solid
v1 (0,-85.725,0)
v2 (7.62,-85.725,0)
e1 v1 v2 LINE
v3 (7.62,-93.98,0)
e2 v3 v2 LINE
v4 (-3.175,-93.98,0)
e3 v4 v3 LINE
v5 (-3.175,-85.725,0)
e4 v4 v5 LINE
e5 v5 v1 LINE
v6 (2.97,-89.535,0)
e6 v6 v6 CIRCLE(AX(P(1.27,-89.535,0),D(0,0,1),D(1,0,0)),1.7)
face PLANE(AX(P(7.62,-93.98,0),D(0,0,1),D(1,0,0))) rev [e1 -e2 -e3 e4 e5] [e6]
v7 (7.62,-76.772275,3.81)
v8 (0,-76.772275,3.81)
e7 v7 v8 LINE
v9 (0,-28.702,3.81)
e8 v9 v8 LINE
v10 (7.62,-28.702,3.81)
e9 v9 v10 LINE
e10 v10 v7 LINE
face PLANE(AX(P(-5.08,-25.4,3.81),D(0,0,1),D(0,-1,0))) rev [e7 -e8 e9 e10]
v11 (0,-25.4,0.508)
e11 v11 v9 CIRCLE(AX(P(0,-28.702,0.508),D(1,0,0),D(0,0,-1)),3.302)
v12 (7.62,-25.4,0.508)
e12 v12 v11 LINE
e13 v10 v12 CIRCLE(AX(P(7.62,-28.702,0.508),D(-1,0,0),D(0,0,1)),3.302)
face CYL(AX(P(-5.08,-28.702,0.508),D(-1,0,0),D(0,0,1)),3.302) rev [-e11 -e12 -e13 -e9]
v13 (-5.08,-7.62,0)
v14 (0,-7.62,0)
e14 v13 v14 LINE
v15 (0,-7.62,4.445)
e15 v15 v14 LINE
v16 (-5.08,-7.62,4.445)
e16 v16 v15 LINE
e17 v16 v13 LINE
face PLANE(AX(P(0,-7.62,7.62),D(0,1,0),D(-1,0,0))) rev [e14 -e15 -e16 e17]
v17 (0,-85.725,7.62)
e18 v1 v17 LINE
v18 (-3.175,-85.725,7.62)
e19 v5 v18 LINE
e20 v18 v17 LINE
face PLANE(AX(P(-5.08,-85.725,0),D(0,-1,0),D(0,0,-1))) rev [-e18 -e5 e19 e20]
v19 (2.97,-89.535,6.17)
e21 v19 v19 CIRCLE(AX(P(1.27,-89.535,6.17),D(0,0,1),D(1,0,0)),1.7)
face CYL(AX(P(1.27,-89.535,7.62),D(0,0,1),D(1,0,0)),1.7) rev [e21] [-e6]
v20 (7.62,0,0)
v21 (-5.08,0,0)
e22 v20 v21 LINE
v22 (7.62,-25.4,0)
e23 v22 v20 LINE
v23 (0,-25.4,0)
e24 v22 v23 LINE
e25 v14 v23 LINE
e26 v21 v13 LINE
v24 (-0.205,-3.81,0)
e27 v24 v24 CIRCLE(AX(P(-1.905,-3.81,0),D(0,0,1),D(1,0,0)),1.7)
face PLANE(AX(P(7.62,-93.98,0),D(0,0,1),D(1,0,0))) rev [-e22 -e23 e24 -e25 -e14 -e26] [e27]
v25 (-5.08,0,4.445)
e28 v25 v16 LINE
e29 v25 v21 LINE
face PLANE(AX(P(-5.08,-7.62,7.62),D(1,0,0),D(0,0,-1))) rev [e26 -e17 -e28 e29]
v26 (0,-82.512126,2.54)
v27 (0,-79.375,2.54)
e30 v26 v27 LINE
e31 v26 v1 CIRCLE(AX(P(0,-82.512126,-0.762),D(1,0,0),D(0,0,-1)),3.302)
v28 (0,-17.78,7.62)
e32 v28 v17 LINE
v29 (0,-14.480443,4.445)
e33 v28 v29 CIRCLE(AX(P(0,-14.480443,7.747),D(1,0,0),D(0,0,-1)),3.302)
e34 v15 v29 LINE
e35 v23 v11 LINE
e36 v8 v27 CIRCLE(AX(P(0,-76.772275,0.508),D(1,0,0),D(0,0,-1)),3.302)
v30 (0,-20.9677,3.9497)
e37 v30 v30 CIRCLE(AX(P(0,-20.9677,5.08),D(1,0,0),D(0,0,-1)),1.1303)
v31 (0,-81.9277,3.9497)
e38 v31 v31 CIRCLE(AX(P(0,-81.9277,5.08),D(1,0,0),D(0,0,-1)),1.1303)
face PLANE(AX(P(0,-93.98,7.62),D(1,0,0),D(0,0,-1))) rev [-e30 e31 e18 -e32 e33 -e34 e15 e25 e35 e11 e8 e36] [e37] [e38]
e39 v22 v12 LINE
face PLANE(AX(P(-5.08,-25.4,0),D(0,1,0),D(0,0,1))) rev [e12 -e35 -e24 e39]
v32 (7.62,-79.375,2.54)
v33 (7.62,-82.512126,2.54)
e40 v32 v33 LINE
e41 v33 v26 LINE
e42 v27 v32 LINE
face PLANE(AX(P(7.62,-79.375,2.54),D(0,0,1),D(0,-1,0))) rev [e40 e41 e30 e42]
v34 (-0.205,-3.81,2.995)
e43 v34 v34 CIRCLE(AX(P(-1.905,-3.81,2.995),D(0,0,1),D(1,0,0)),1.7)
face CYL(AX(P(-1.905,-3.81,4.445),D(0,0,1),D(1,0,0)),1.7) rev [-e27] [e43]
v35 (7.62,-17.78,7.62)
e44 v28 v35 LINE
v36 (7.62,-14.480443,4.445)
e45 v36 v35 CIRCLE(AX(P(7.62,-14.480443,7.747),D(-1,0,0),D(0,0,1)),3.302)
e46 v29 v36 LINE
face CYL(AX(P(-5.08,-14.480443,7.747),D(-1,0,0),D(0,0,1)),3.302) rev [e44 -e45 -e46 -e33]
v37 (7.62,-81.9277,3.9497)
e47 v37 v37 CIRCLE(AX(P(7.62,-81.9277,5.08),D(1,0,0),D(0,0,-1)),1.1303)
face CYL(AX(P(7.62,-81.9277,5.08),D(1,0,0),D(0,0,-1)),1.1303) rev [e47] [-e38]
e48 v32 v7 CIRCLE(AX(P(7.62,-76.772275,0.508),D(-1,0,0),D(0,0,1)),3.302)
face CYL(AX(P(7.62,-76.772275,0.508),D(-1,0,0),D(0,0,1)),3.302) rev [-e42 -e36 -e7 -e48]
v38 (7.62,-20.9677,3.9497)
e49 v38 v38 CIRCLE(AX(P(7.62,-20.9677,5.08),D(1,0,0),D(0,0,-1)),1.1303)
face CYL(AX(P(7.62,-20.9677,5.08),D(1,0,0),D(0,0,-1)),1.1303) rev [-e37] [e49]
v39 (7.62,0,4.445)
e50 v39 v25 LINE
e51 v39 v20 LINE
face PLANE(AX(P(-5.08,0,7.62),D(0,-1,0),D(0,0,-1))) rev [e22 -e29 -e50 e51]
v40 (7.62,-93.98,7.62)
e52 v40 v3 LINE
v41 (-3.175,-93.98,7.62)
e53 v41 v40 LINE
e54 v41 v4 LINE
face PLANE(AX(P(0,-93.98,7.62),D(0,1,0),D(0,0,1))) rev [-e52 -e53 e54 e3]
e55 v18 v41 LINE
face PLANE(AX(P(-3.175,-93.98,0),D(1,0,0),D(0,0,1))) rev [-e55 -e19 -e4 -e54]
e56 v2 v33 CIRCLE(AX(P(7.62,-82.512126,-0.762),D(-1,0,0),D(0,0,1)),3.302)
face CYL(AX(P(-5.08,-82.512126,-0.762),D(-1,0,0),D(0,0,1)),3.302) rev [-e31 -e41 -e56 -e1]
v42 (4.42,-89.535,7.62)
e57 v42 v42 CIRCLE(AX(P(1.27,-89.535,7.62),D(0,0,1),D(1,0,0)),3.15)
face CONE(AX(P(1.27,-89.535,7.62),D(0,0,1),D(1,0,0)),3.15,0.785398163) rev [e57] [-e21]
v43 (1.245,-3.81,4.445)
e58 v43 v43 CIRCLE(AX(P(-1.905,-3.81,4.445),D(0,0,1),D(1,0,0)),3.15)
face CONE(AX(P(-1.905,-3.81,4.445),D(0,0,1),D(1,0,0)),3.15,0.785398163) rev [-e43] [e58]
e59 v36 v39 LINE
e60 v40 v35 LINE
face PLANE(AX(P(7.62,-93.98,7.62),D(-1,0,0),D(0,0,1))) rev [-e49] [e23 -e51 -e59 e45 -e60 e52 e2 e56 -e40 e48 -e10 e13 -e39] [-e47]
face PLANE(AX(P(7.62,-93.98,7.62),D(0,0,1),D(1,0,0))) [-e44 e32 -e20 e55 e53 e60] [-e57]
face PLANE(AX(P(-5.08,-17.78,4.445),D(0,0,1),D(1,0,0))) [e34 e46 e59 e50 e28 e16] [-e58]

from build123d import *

# Parameters (mm, degrees)
BOSS_EXTRUDE1_DEPTH                             = 7.62
SKETCH11_W                                      = 17.78
SKETCH11_H                                      = 17.78
CUT_EXTRUDE1_DEPTH                              = 3.175
SKETCH12_W                                      = 3.81
SKETCH12_H                                      = 60.325
CUT_EXTRUDE2_DEPTH                              = 96.139869666
SKETCH14_W                                      = 7.62
SKETCH14_H                                      = 8.255
BOSS_EXTRUDE3_DEPTH                             = 3.175
SKETCH24_W                                      = 7.62
SKETCH24_H                                      = 6.35
BOSS_EXTRUDE4_DEPTH                             = 1.27
CSK_FOR_M3_FLAT_HEAD_MACHINE_SCREW2_D           = 3.4
CSK_FOR_M3_FLAT_HEAD_MACHINE_SCREW2_CSINK_D     = 6.3
CSK_FOR_M3_FLAT_HEAD_MACHINE_SCREW2_CSINK_ANGLE = 90
CSK_FOR_M3_FLAT_HEAD_MACHINE_SCREW3_D           = 3.4
CSK_FOR_M3_FLAT_HEAD_MACHINE_SCREW3_CSINK_D     = 6.3
CSK_FOR_M3_FLAT_HEAD_MACHINE_SCREW3_CSINK_ANGLE = 90
F_4_40_TAPPED_HOLE2_D                           = 2.2606
F_4_40_TAPPED_HOLE2_DEPTH                       = 8.8646
F_4_40_TAPPED_HOLE2_TIP                         = 0.679152758
SKETCH25_W                                      = 5.08
SKETCH25_H                                      = 93.98
CUT_EXTRUDE3_DEPTH                              = 96.139869666
FILLET1_R                                       = 3.302


with BuildPart() as part:
    # Sketch1 → Boss-Extrude1 (new body)
    with BuildSketch(Plane.XY):
        Polygon((0, -93.98), (0, -7.62), (-5.08, -7.62), (-5.08, 0), (12.7, 0), (12.7, -7.62), (7.62, -7.62), (7.62, -93.98), align=None)
    extrude(amount=BOSS_EXTRUDE1_DEPTH)

    # Sketch11 → Cut-Extrude1 (cut)
    with BuildSketch(Plane.XY.offset(7.62)):
        with Locations((3.81, -8.89)):
            Rectangle(SKETCH11_W, SKETCH11_H)
    extrude(amount=-CUT_EXTRUDE1_DEPTH, mode=Mode.SUBTRACT)

    # Sketch12 → Cut-Extrude2 (cut, through all)
    with BuildSketch(Plane(origin=(7.62, 0, 0), x_dir=(0, 0, -1), z_dir=(1, 0, 0))):
        with Locations((-1.905, -55.5625)):
            Rectangle(SKETCH12_W, SKETCH12_H)
    extrude(amount=-CUT_EXTRUDE2_DEPTH, mode=Mode.SUBTRACT)

    # Sketch14 → Boss-Extrude3 (add)
    with BuildSketch(Plane(origin=(7.62, 0, 0), x_dir=(0, 0, -1), z_dir=(1, 0, 0))):
        with Locations((-3.81, -89.8525)):
            Rectangle(SKETCH14_W, SKETCH14_H)
    boss_extrude3 = extrude(amount=BOSS_EXTRUDE3_DEPTH)

    # Mirror1: Boss-Extrude3 across plane
    add(boss_extrude3.mirror(Plane(origin=(3.81, 0, 0), x_dir=(0, 0, 1), z_dir=(1, 0, 0))))

    # Sketch24 → Boss-Extrude4 (add)
    with BuildSketch(Plane(origin=(0, 0, 3.81), x_dir=(-1, 0, 0), z_dir=(0, 0, -1))):
        with Locations((-3.81, -82.55)):
            Rectangle(SKETCH24_W, SKETCH24_H)
    extrude(amount=BOSS_EXTRUDE4_DEPTH)

    # CSK for M3 Flat Head Machine Screw2 (through all)
    with Locations(Plane.XY.offset(7.62)):
        with Locations((1.27, -89.535)):
            CounterSinkHole(CSK_FOR_M3_FLAT_HEAD_MACHINE_SCREW2_D / 2, CSK_FOR_M3_FLAT_HEAD_MACHINE_SCREW2_CSINK_D / 2, counter_sink_angle=CSK_FOR_M3_FLAT_HEAD_MACHINE_SCREW2_CSINK_ANGLE)

    # CSK for M3 Flat Head Machine Screw3 (through all)
    with Locations(Plane.XY.offset(4.445)):
        with Locations((-1.905, -3.81)):
            CounterSinkHole(CSK_FOR_M3_FLAT_HEAD_MACHINE_SCREW3_D / 2, CSK_FOR_M3_FLAT_HEAD_MACHINE_SCREW3_CSINK_D / 2, counter_sink_angle=CSK_FOR_M3_FLAT_HEAD_MACHINE_SCREW3_CSINK_ANGLE)

    # #4-40 Tapped Hole2
    with Locations(Plane(origin=(7.62, 0, 0), x_dir=(0, 0, -1), z_dir=(1, 0, 0))):
        with Locations((-5.08, -20.9677), (-5.08, -81.9277)):
            Hole(F_4_40_TAPPED_HOLE2_D / 2, depth=F_4_40_TAPPED_HOLE2_DEPTH)
            with Locations((0, 0, -(F_4_40_TAPPED_HOLE2_DEPTH + F_4_40_TAPPED_HOLE2_TIP / 2))):  # 118° drill point
                Cone(0, F_4_40_TAPPED_HOLE2_D / 2, F_4_40_TAPPED_HOLE2_TIP, mode=Mode.SUBTRACT)

    # Sketch25 → Cut-Extrude3 (cut, through all)
    with BuildSketch(Plane(origin=(0, 0, 0), x_dir=(-1, 0, 0), z_dir=(0, 0, -1))):
        with Locations((-10.16, -46.99)):
            Rectangle(SKETCH25_W, SKETCH25_H)
    extrude(amount=-CUT_EXTRUDE3_DEPTH, mode=Mode.SUBTRACT)

    # Fillet1
    # the kernel refuses this fillet: 3.302 mm, written as the material it adds along each edge
    with BuildSketch(Plane(origin=(7.62, -85.725, 2.54), x_dir=(0, 0, -1), z_dir=(-1, 0, 0))) as fillet1_piece_1:
        with BuildLine():
            CenterArc((3.302, -3.212874103), FILLET1_R, 103.342363797, 76.657636203)
            Line((0, -3.212874103), (-0.06604, -3.212874103))
            Line((-0.06604, -3.212874103), (-0.06604, 0))
            Line((-0.06604, 0), (0, 0.06604))
            ThreePointArc((0, 0.06604), (1.27, 0.06604), (2.52476, 0.064257482))
            Line((2.52476, 0.064257482), (2.54, 0))
        make_face()
    extrude(amount=7.62)
    with BuildSketch(Plane(origin=(0, -79.375, 3.81), x_dir=(0, 0, -1), z_dir=(1, 0, 0))) as fillet1_piece_2:
        with BuildLine():
            CenterArc((3.302, 2.602725495), FILLET1_R, 180, 52.020127555)
            Line((0, 2.602725495), (-0.06604, 2.602725495))
            Line((-0.06604, 2.602725495), (-0.06604, 0))
            Line((-0.06604, 0), (0, -0.06604))
            ThreePointArc((0, -0.06604), (0.635, -0.06604), (1.22936, -0.05205451))
            Line((1.22936, -0.05205451), (1.27, 0))
        make_face()
    extrude(amount=7.62)
    with BuildSketch(Plane(origin=(7.62, -25.4, 3.81), x_dir=(0, 0, -1), z_dir=(-1, 0, 0))) as fillet1_piece_3:
        with BuildLine():
            CenterArc((FILLET1_R, FILLET1_R), FILLET1_R, 180, 90)
            Line((0, FILLET1_R), (-FILLET1_R * 0.02, FILLET1_R))
            Line((-FILLET1_R * 0.02, FILLET1_R), (-FILLET1_R * 0.02, -FILLET1_R * 0.02))
            Line((-FILLET1_R * 0.02, -FILLET1_R * 0.02), (FILLET1_R, -FILLET1_R * 0.02))
            Line((FILLET1_R, -FILLET1_R * 0.02), (FILLET1_R, 0))
        make_face()
    extrude(amount=7.62)
    with BuildSketch(Plane(origin=(7.62, -17.78, 4.445), x_dir=(0, 0, 1), z_dir=(-1, 0, 0))) as fillet1_piece_4:
        with BuildLine():
            CenterArc((3.302, 3.299556788), FILLET1_R, 180, 87.795772496)
            Line((0, 3.299556788), (-0.06604, 3.299556788))
            Line((-0.06604, 3.299556788), (-0.06604, 0))
            Line((-0.06604, 0), (0, -0.06604))
            ThreePointArc((0, -0.06604), (1.5875, -0.06604), (3.17246, -0.065991136))
            Line((3.17246, -0.065991136), (3.175, 0))
        make_face()
    extrude(amount=7.62)


solid = part.part
